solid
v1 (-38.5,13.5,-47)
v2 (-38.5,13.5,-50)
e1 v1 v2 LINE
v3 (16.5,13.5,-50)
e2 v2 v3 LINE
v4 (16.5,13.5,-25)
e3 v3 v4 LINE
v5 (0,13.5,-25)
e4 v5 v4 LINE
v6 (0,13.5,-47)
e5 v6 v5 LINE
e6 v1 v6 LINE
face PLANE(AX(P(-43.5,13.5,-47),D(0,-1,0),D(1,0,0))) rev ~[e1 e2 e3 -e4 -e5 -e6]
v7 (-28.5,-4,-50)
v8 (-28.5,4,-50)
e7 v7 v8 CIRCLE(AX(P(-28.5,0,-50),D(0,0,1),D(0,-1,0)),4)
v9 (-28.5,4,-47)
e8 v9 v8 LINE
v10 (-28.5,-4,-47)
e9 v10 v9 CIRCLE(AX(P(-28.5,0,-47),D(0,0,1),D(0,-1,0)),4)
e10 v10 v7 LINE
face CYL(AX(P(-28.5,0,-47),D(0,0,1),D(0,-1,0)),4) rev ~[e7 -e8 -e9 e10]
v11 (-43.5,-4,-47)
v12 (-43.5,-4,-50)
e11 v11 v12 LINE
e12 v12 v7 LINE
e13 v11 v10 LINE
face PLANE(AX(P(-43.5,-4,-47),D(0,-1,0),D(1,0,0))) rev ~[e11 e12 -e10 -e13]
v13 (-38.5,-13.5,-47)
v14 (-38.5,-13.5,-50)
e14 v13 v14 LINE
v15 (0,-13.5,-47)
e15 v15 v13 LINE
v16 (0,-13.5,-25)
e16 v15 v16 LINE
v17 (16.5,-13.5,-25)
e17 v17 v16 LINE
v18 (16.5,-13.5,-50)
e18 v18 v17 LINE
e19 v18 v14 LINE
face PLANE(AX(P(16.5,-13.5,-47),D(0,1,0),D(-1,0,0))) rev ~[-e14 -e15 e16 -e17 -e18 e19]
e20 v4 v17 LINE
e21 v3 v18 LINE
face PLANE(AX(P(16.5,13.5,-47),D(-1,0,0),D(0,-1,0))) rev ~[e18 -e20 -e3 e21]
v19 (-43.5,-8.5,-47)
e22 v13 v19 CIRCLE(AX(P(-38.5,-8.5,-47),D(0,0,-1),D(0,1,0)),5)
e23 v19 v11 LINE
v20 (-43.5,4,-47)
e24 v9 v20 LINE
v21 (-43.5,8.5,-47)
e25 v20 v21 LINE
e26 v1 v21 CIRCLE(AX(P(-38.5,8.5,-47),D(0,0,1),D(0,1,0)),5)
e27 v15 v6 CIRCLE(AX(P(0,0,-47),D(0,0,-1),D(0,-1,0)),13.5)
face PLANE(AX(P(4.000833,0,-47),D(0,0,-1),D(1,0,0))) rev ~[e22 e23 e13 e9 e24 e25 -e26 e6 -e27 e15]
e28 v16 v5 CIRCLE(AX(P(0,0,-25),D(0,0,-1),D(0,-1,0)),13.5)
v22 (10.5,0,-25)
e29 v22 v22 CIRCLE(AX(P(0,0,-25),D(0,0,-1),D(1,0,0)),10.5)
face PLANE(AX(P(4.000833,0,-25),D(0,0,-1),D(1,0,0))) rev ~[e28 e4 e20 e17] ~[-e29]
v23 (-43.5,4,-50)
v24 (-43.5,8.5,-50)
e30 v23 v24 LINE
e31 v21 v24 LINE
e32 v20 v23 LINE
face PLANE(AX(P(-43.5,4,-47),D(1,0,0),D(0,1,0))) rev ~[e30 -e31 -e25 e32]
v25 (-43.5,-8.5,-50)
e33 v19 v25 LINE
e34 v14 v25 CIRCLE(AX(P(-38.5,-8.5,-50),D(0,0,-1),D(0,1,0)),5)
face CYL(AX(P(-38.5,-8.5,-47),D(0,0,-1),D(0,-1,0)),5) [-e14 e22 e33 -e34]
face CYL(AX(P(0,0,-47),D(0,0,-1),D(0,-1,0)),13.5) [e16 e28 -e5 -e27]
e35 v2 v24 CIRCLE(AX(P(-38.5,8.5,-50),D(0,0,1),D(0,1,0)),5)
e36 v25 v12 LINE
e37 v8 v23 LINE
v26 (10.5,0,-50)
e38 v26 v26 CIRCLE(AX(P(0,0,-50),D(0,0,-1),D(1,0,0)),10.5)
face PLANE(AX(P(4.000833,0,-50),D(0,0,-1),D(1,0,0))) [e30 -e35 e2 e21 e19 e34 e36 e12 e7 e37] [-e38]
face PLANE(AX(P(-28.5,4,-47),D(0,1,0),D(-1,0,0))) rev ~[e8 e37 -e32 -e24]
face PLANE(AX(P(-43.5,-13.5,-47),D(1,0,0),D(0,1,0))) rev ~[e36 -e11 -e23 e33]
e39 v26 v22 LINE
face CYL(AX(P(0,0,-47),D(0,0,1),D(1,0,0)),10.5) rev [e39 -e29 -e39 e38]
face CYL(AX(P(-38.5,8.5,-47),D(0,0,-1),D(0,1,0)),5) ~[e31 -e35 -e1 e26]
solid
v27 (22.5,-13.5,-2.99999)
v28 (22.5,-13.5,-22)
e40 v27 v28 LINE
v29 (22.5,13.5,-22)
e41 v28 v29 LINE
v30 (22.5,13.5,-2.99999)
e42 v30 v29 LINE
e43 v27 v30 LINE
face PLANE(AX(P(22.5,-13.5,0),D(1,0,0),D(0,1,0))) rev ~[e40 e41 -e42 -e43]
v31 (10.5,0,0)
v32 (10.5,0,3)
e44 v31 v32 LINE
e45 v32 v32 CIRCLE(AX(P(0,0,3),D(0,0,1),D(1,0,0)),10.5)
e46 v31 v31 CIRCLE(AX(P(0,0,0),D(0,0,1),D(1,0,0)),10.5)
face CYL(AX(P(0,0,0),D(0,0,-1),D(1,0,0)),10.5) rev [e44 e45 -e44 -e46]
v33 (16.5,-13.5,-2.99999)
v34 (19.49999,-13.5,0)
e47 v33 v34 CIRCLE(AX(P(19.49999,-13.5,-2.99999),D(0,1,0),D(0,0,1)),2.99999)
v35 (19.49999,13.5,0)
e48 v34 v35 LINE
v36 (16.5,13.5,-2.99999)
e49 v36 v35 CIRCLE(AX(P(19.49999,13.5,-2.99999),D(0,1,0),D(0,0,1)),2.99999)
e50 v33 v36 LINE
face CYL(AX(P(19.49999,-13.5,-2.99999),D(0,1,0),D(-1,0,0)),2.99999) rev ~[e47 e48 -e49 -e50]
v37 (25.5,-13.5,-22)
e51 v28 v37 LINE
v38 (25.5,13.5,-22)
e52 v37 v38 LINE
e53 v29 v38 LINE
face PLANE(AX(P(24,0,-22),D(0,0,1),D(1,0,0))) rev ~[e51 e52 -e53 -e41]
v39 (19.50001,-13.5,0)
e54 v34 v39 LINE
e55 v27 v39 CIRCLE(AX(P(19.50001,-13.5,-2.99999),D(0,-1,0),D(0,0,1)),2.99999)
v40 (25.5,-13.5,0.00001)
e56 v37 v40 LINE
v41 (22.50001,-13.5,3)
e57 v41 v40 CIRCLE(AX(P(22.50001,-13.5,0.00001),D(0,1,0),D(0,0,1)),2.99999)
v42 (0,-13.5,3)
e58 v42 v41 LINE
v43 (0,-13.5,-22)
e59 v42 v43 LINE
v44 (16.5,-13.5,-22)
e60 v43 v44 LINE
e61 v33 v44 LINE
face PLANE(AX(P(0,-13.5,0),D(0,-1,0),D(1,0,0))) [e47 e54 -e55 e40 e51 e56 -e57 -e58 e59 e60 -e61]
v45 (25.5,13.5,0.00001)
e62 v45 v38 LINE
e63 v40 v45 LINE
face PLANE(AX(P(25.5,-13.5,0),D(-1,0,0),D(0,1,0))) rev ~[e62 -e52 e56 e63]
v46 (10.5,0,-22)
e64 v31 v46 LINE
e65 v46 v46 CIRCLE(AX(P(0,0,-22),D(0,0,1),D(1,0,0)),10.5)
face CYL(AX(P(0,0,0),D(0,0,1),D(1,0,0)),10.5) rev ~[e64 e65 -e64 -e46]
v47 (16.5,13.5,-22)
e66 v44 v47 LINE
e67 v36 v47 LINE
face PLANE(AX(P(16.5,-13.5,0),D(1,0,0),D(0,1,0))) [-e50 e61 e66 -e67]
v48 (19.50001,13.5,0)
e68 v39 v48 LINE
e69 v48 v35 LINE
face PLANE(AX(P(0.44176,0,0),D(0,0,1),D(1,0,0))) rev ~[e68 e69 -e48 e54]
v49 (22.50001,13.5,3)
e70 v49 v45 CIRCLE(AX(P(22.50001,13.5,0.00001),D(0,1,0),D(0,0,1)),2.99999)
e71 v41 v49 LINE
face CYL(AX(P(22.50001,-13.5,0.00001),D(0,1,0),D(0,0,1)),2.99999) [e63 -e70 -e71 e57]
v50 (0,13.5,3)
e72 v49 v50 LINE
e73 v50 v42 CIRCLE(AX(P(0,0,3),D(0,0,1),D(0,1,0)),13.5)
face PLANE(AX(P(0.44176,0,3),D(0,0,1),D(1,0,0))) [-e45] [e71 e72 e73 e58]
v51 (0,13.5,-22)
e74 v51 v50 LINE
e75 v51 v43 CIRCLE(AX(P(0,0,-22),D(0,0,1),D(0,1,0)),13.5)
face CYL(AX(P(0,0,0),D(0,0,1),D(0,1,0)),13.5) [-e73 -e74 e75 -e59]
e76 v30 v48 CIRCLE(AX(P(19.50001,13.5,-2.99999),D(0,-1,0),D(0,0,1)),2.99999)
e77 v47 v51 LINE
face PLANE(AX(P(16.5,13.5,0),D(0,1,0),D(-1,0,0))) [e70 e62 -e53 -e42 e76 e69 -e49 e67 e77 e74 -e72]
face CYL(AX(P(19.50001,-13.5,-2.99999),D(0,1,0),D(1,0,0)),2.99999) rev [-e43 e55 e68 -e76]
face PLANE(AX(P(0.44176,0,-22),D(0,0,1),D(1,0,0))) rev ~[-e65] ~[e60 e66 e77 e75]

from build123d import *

# Parameters (mm, degrees)
F0_R     = 10.5
F0_W     = 6
F0_H     = 27
F0_W_2   = 3
F1_DEPTH = 3
F2_DEPTH = 22
F3_R     = 2.99999
F5_R     = 10.5
F6_DEPTH = 22
F7_DEPTH = 3
F8_R     = 5


# Not quite as in the source:
# - a fillet or chamfer is up to 0.001 mm smaller than in the source, because OpenCascade refuses the exact size


with BuildPart() as f1:
    # F0 (on Top) → F1 (new body)
    with BuildSketch(Plane.XY):
        with BuildLine():
            ThreePointArc((0, -13.5), (9.545941546, -9.545941546), (13.5, 0))
            ThreePointArc((13.5, 0), (9.545941546, 9.545941546), (0, 13.5))
            ThreePointArc((0, 13.5), (-13.5, 0), (0, -13.5))
        make_face()
        Circle(F0_R, mode=Mode.SUBTRACT)
        with BuildLine():
            Line((13.5, -13.5), (13.5, 0))
            ThreePointArc((13.5, 0), (9.545941546, -9.545941546), (0, -13.5))
            Line((0, -13.5), (13.5, -13.5))
        make_face()
        with BuildLine():
            ThreePointArc((0, 13.5), (9.545941546, 9.545941546), (13.5, 0))
            Line((13.5, 0), (13.5, 13.5))
            Line((13.5, 13.5), (0, 13.5))
        make_face()
        Polygon((13.5, 13.5), (13.5, 0), (13.5, -13.5), (16.5, -13.5), (16.5, 13.5), align=None)
        with Locations((19.5, 0)):
            Rectangle(F0_W, F0_H)
        with Locations((24, 0)):
            Rectangle(F0_W_2, F0_H)
    extrude(amount=F1_DEPTH)

    # F0 (on Top) → F2 (join)
    with BuildSketch(Plane.XY):
        with BuildLine():
            ThreePointArc((0, -13.5), (9.545941546, -9.545941546), (13.5, 0))
            ThreePointArc((13.5, 0), (9.545941546, 9.545941546), (0, 13.5))
            ThreePointArc((0, 13.5), (-13.5, 0), (0, -13.5))
        make_face()
        Circle(F0_R, mode=Mode.SUBTRACT)
        with BuildLine():
            ThreePointArc((0, 13.5), (9.545941546, 9.545941546), (13.5, 0))
            Line((13.5, 0), (13.5, 13.5))
            Line((13.5, 13.5), (0, 13.5))
        make_face()
        Polygon((13.5, 13.5), (13.5, 0), (13.5, -13.5), (16.5, -13.5), (16.5, 13.5), align=None)
        with Locations((24, 0)):
            Rectangle(F0_W_2, F0_H)
        with BuildLine():
            Line((13.5, -13.5), (13.5, 0))
            ThreePointArc((13.5, 0), (9.545941546, -9.545941546), (0, -13.5))
            Line((0, -13.5), (13.5, -13.5))
        make_face()
    extrude(amount=-F2_DEPTH)

    # F3 (radius 3 in the source; OpenCascade refuses exactly that, so slightly less here)
    f3_edges = [f1.edges().sort_by_distance(p)[0] for p in [
        (16.5, 0, 0),
        (22.5, 0, 0),
        (25.5, 0, 3),
    ]]
    fillet(f3_edges, radius=F3_R)


with BuildPart() as f6:
    # F5 (on offset) → F6 (new body)
    with BuildSketch(Plane(origin=(0, 0, -47), x_dir=(1, 0, 0), z_dir=(0, 0, -1))):
        with BuildLine():
            Line((16.5, 13.5), (0, 13.5))
            ThreePointArc((0, 13.5), (-13.5, 0), (0, -13.5))
            Line((0, -13.5), (16.5, -13.5))
            Line((16.5, -13.5), (16.5, 13.5))
        make_face()
        Circle(F5_R, mode=Mode.SUBTRACT)
    extrude(amount=-F6_DEPTH)

    # F5 (on offset) → F7 (join)
    with BuildSketch(Plane(origin=(0, 0, -47), x_dir=(1, 0, 0), z_dir=(0, 0, -1))):
        with BuildLine():
            Line((16.5, 13.5), (0, 13.5))
            ThreePointArc((0, 13.5), (-13.5, 0), (0, -13.5))
            Line((0, -13.5), (16.5, -13.5))
            Line((16.5, -13.5), (16.5, 13.5))
        make_face()
        Circle(F5_R, mode=Mode.SUBTRACT)
        with BuildLine():
            ThreePointArc((0, -13.5), (-13.5, 0), (0, 13.5))
            Line((0, 13.5), (-43.5, 13.5))
            Line((-43.5, 13.5), (-43.5, 4))
            Line((-43.5, 4), (-28.5, 4))
            ThreePointArc((-28.5, 4), (-24.5, 0), (-28.5, -4))
            Line((-28.5, -4), (-43.5, -4))
            Line((-43.5, -4), (-43.5, -13.5))
            Line((-43.5, -13.5), (0, -13.5))
        make_face()
    extrude(amount=F7_DEPTH)

    # F8
    f8_edges = [f6.edges().sort_by_distance(p)[0] for p in [
        (-43.5, -13.5, -48.5),
        (-43.5, 13.5, -48.5),
    ]]
    fillet(f8_edges, radius=F8_R)


solid = Compound([f1.part, f6.part])
